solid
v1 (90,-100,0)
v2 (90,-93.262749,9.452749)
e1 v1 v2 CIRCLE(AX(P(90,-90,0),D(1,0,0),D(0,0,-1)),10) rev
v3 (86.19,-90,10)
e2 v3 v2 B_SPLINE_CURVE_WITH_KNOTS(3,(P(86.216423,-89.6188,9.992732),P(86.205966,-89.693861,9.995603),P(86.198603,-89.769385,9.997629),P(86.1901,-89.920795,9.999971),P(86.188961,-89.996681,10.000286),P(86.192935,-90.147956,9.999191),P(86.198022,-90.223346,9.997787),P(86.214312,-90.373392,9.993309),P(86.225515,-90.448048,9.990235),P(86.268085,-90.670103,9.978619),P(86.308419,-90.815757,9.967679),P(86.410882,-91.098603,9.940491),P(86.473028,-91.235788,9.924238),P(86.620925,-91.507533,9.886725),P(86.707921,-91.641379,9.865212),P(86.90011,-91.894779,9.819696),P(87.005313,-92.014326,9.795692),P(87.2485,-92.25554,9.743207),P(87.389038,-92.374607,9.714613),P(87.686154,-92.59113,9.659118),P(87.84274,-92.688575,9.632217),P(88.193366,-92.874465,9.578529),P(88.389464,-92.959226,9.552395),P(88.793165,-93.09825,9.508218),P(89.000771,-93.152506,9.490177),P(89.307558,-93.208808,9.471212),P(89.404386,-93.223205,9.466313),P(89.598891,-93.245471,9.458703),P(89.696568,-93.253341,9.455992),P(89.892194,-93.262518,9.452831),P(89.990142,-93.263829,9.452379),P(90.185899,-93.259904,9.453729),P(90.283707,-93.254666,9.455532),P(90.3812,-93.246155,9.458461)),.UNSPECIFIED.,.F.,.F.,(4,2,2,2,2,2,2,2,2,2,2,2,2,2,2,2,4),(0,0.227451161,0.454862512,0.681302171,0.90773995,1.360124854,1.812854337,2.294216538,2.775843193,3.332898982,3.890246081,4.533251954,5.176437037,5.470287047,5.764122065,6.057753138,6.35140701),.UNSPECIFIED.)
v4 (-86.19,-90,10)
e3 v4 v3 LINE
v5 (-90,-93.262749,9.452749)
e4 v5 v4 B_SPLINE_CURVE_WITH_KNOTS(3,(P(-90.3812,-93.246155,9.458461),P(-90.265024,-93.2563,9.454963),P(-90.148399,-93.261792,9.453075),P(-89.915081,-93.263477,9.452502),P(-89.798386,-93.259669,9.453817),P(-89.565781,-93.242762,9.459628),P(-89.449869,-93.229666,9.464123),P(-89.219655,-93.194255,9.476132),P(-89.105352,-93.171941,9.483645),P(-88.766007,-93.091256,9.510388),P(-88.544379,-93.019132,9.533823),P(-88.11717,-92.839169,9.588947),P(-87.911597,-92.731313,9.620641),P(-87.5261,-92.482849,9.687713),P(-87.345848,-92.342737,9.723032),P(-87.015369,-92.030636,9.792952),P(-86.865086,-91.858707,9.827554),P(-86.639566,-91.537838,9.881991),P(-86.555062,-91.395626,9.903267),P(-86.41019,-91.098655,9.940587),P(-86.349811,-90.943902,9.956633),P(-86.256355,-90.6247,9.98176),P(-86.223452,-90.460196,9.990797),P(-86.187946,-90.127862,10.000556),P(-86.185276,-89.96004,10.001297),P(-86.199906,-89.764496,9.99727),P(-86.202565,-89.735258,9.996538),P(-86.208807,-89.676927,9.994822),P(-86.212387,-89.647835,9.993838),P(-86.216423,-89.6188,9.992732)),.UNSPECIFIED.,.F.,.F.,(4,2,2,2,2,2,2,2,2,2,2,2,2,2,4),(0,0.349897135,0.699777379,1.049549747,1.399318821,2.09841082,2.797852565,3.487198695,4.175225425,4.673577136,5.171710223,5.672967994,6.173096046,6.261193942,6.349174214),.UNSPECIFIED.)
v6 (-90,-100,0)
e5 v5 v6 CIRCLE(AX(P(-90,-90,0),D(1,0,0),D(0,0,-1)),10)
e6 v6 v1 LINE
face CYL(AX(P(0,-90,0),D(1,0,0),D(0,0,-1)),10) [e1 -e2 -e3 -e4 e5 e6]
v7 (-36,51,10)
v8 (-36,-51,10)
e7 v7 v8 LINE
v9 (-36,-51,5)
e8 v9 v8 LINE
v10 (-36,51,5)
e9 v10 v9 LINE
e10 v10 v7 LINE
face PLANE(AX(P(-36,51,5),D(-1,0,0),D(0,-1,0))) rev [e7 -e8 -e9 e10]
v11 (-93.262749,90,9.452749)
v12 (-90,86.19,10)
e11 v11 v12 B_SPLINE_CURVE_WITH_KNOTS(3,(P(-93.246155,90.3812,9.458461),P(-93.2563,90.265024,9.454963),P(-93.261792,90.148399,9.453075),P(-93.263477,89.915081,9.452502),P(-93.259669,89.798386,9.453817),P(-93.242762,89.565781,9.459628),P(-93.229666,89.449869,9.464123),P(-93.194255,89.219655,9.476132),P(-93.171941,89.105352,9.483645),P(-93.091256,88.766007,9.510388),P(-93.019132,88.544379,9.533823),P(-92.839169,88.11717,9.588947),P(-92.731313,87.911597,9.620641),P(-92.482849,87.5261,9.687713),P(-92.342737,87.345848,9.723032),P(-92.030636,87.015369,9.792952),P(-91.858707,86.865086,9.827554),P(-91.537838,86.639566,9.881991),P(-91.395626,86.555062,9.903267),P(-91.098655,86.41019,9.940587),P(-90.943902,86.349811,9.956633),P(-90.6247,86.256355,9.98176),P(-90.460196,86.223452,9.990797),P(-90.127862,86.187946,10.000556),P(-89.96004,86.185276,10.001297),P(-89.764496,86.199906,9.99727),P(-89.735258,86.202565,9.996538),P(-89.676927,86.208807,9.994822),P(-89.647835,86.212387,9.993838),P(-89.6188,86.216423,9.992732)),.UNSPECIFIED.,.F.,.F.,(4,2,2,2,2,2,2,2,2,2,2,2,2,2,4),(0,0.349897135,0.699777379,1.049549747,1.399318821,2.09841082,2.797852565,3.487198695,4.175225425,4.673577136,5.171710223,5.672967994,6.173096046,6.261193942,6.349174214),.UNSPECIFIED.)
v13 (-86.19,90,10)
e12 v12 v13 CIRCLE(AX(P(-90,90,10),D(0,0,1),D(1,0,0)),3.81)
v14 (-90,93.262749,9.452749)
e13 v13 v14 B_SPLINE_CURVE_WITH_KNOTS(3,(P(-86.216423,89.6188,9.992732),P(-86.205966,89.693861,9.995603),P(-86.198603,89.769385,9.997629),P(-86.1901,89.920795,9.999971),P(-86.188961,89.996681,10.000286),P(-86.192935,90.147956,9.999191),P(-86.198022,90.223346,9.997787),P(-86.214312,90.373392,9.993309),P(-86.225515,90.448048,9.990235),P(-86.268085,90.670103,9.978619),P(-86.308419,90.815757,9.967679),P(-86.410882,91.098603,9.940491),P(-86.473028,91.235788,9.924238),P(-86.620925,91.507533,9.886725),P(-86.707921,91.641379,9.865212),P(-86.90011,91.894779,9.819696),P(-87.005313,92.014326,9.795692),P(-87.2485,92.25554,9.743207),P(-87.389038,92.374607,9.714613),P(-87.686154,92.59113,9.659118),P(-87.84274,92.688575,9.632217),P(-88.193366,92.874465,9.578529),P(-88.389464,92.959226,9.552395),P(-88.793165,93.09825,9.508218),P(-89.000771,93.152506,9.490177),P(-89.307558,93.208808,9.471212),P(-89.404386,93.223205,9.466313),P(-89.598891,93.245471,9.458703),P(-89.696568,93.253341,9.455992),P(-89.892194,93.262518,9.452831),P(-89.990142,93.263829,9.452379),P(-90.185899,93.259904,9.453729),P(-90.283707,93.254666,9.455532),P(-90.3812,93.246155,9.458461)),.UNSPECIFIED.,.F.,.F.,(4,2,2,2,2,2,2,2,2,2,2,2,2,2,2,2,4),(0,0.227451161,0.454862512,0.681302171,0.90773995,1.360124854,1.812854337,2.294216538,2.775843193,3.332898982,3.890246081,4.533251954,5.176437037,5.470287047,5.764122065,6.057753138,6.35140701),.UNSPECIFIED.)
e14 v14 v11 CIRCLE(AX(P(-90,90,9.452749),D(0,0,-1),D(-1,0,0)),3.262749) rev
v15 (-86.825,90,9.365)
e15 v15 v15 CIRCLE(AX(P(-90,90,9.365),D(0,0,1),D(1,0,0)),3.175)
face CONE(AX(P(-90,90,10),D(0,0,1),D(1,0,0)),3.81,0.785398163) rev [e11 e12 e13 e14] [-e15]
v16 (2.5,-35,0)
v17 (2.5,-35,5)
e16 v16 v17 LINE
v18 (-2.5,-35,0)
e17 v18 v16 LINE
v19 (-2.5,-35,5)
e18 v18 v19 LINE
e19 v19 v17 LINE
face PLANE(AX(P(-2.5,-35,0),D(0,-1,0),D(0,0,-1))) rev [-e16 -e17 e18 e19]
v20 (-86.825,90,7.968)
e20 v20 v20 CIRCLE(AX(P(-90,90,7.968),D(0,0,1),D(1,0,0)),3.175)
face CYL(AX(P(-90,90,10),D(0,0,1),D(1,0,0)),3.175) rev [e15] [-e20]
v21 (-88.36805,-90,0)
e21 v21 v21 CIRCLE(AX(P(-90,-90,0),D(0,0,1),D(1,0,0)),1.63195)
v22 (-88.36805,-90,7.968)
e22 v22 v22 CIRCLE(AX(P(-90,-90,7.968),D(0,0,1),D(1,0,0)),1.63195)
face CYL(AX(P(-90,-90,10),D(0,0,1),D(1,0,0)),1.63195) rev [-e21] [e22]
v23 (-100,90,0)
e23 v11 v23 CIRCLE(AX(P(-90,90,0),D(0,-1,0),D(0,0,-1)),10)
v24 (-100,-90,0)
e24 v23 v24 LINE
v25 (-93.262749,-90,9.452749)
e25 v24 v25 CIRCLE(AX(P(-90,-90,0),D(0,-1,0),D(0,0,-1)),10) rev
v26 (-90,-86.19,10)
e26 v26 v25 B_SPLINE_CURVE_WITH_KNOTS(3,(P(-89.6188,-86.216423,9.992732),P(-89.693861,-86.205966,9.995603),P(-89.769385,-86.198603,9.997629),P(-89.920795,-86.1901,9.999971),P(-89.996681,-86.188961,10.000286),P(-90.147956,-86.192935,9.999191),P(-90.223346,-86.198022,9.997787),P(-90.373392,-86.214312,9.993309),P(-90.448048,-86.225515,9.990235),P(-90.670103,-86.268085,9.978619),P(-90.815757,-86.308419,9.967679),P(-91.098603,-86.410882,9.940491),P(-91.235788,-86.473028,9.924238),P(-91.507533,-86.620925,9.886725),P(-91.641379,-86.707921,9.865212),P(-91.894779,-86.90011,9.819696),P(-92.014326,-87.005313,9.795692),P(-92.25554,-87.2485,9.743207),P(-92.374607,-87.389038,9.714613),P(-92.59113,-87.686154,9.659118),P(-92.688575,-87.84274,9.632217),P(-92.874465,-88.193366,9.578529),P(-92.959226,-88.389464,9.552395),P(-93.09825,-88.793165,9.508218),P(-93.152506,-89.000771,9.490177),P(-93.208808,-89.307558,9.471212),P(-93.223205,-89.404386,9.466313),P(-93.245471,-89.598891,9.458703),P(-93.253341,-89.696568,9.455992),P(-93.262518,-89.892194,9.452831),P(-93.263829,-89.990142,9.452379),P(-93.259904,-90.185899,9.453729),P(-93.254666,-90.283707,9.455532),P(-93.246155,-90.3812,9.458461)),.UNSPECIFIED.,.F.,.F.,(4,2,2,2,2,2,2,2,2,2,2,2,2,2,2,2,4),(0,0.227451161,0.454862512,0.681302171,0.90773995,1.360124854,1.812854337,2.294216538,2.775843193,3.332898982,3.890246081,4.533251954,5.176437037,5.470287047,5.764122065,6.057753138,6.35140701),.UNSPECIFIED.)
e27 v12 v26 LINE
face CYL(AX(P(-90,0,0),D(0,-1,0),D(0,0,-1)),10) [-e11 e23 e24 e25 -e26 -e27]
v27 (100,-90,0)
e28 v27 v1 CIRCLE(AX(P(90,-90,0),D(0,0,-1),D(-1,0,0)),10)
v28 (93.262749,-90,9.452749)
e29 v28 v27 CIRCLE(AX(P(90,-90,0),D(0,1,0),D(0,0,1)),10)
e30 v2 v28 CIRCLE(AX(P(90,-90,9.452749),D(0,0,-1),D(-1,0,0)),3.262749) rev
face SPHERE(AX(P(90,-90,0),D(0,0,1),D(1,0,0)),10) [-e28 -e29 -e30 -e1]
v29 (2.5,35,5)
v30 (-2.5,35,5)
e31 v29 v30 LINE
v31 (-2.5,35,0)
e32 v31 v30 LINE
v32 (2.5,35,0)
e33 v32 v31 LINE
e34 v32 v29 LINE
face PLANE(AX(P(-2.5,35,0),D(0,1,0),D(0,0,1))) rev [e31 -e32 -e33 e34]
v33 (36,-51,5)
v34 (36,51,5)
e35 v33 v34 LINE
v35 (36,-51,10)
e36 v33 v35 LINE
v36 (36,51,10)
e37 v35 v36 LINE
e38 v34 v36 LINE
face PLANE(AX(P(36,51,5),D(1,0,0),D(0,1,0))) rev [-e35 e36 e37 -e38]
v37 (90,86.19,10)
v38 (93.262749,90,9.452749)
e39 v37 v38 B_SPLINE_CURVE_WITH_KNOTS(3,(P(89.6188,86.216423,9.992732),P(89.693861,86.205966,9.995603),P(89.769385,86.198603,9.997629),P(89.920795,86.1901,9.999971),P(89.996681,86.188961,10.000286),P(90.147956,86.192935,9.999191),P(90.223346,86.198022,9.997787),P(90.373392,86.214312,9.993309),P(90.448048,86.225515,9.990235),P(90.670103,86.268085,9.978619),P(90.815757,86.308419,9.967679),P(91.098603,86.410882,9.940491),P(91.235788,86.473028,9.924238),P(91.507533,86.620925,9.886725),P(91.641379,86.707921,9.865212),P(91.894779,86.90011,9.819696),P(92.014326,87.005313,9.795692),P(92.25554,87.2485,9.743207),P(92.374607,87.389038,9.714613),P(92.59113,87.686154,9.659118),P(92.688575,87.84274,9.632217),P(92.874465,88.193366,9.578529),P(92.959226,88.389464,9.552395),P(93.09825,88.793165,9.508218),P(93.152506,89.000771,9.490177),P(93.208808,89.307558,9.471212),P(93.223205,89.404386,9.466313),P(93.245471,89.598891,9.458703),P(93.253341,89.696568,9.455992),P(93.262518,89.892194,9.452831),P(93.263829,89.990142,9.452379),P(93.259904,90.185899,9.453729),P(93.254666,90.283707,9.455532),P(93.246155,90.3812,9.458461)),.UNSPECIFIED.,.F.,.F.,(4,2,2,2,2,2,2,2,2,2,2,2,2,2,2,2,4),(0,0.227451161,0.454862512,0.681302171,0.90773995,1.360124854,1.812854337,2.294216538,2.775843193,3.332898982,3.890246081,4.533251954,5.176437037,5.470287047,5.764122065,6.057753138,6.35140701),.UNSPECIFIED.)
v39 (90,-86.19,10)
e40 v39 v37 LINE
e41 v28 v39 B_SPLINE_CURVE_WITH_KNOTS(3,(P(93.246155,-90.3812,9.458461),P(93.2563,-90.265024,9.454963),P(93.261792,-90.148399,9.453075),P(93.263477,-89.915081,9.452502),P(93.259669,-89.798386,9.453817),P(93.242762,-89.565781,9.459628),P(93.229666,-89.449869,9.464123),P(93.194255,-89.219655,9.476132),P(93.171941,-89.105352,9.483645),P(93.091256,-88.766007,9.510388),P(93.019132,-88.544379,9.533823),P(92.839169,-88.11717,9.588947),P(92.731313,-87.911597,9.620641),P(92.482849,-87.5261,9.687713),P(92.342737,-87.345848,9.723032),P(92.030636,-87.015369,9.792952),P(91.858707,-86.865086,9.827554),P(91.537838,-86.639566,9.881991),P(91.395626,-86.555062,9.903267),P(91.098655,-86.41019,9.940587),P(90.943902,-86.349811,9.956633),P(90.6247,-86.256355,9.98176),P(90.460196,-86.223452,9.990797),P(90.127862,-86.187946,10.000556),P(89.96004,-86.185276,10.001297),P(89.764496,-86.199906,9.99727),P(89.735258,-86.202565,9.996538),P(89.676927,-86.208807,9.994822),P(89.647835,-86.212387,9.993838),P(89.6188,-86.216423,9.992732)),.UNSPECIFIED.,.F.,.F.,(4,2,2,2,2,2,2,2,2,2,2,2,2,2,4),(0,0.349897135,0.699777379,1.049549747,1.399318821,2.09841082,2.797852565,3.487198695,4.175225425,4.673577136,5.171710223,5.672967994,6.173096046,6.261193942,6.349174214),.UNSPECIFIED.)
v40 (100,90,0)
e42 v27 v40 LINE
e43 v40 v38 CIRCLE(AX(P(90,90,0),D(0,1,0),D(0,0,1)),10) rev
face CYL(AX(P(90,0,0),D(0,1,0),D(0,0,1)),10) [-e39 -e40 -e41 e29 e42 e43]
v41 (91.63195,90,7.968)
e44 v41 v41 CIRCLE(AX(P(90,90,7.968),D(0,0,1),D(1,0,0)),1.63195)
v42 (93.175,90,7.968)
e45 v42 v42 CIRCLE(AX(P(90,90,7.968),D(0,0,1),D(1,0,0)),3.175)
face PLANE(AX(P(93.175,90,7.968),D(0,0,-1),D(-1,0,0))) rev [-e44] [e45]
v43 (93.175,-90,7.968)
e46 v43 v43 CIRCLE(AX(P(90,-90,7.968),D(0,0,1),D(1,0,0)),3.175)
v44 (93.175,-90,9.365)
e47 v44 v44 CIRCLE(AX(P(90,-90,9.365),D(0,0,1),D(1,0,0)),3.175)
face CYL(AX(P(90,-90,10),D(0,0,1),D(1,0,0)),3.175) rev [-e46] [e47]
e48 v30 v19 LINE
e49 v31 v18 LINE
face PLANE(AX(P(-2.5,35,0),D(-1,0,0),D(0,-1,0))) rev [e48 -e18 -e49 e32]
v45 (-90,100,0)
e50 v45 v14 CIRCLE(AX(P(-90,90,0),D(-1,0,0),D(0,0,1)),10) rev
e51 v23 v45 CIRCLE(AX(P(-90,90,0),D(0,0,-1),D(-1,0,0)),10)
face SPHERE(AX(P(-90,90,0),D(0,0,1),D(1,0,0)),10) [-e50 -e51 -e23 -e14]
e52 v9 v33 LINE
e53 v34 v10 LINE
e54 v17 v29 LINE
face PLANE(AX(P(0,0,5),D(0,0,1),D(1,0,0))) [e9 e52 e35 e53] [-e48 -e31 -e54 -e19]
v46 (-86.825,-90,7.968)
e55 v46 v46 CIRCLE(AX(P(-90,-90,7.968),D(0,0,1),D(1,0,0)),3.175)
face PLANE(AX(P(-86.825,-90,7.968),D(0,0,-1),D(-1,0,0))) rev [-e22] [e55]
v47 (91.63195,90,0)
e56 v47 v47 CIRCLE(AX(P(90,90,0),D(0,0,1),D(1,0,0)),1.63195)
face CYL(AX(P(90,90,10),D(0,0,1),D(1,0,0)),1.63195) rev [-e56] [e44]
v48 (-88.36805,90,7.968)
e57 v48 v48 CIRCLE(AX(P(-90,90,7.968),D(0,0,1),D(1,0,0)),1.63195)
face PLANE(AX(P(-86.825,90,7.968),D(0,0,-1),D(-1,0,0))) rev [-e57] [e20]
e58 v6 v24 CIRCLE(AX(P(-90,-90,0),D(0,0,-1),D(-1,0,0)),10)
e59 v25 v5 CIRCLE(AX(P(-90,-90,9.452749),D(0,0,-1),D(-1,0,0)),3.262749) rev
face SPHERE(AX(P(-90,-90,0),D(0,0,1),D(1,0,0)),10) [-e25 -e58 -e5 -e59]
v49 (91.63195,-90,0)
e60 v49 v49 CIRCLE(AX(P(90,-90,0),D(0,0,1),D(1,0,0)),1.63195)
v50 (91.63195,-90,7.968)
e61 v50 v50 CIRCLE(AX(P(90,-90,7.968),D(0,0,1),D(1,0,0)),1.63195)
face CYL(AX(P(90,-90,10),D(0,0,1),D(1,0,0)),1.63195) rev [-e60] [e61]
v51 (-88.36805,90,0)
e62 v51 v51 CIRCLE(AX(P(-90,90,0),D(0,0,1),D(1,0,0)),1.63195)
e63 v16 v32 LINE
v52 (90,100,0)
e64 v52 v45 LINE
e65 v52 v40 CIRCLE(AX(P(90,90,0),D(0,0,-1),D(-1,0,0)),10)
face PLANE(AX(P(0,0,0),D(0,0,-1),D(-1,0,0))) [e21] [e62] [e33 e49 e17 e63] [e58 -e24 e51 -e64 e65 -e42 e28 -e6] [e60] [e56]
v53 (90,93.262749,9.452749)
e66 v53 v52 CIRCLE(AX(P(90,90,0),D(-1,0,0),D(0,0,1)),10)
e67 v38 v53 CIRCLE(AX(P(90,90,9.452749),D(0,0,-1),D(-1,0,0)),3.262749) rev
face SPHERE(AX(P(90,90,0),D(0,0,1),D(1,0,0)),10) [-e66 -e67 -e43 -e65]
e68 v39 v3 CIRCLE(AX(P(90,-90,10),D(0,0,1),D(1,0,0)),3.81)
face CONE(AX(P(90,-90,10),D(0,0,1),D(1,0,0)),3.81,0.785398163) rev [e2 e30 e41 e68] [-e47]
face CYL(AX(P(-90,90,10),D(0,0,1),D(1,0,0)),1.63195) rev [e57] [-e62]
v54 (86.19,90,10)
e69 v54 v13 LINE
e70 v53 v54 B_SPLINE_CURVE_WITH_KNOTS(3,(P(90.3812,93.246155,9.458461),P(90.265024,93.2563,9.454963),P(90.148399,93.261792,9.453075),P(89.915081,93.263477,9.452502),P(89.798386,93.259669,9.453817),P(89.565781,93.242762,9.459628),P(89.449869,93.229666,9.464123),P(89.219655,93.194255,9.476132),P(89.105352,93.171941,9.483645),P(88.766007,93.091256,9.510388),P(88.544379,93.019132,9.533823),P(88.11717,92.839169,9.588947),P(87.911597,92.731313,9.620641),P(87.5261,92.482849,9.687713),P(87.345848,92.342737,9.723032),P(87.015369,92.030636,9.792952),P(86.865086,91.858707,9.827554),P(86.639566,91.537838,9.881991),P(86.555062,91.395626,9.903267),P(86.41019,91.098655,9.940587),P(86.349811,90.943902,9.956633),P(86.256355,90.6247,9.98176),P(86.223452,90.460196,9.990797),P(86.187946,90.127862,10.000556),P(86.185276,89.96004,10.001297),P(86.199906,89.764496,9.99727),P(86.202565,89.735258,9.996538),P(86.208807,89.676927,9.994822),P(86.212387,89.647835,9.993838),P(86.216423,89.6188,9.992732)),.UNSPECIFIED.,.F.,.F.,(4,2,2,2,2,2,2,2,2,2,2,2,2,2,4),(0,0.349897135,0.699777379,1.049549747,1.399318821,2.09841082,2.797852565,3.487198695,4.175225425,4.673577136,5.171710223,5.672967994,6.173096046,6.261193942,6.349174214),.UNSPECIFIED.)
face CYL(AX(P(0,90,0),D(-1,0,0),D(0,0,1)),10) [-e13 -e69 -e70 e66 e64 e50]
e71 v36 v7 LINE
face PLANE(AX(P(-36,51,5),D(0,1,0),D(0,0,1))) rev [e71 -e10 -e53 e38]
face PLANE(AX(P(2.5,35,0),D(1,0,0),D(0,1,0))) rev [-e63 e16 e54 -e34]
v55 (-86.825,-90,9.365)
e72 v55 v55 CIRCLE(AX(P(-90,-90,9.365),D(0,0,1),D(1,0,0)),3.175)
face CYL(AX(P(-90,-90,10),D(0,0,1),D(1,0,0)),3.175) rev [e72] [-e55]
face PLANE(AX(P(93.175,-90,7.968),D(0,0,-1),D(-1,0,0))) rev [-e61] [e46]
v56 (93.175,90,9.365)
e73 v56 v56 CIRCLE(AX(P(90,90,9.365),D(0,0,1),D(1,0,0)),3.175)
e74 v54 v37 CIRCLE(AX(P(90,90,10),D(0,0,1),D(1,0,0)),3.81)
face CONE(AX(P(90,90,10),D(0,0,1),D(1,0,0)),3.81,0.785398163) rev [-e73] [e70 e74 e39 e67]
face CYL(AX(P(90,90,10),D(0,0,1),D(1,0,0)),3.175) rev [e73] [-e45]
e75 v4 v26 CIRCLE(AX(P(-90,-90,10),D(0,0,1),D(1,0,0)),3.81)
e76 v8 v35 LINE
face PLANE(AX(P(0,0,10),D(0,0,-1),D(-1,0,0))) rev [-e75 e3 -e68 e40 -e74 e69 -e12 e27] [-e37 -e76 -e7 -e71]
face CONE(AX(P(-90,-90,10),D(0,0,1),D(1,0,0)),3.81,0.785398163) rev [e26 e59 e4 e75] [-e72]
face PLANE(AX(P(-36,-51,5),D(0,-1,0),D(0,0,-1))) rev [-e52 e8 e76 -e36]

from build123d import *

# Parameters (mm, degrees)
CROQUIS3_W                                  = 200
CROQUIS3_H                                  = 200
SALIENTE_EXTRUIR1_DEPTH                     = 10
CROQUIS4_W                                  = 72
CROQUIS4_H                                  = 102
CORTAR_EXTRUIR2_DEPTH                       = 5
CROQUIS5_W                                  = 5
CROQUIS5_H                                  = 70
CORTAR_EXTRUIR3_DEPTH                       = 142.774468788
REDONDEO1_R                                 = 10
REDONDEO2_R                                 = 10
REDONDEO3_R                                 = 10
REDONDEO4_R                                 = 10
REDONDEO5_R                                 = 10
REFRENTADO_PARA_TORNILLO_CON_CABEZA_2_COUNT = 2
REFRENTADO_PARA_TORNILLO_CON_CABEZA_2_PITCH = 180
REFRENTADO_PARA_TORNILLO_CON_CABEZA_3_COUNT = 2
REFRENTADO_PARA_TORNILLO_CON_CABEZA_3_PITCH = 254.558441227
REFRENTADO_PARA_TORNILLO_CON_CABEZA_4_COUNT = 2
REFRENTADO_PARA_TORNILLO_CON_CABEZA_4_PITCH = 180


# Some blends are built 0.0001 mm under size
with BuildPart() as part:
    # Croquis3 → Saliente-Extruir1 (new body)
    with BuildSketch(Plane.XY):
        Rectangle(CROQUIS3_W, CROQUIS3_H)
    extrude(amount=SALIENTE_EXTRUIR1_DEPTH)

    # Croquis4 → Cortar-Extruir2 (cut)
    with BuildSketch(Plane.XY.offset(10)):
        Rectangle(CROQUIS4_W, CROQUIS4_H)
    extrude(amount=-CORTAR_EXTRUIR2_DEPTH, mode=Mode.SUBTRACT)

    # Croquis5 → Cortar-Extruir3 (cut, through all)
    with BuildSketch(Plane.XY.offset(10)):
        Rectangle(CROQUIS5_W, CROQUIS5_H)
    extrude(amount=-CORTAR_EXTRUIR3_DEPTH, mode=Mode.SUBTRACT)

    # Redondeo1
    redondeo1_edges = [part.edges().sort_by_distance(p)[0] for p in [
        (-100, 0, 10),
        (0, -100, 10),
        (100, 0, 10),
        (0, 100, 10),
    ]]
    fillet(redondeo1_edges, radius=REDONDEO1_R - 0.0001)  # a hair under: the kernel refuses the full size

    # Redondeo2
    # the kernel refuses this fillet: 10 mm, written as the material it takes off along each edge
    with BuildSketch(Plane(origin=(90, 90, 10), x_dir=(1, 0, 0), z_dir=(0, -1, 0))) as redondeo2_piece_1:
        with BuildLine():
            CenterArc((0.0001, -9.9999), 9.9999, 0, 90)
            Line((10, -9.9999), (10, 0))
            Line((10, 0), (0.0001, 0))
        make_face()
    revolve(axis=Axis((90, 90, 10), (0, 0, 1)), revolution_arc=90, mode=Mode.SUBTRACT)
    with BuildSketch(Plane(origin=(100, 100, -25), x_dir=(0, -1, 0), z_dir=(0, 0, 1))) as redondeo2_piece_2:
        with BuildLine():
            CenterArc((REDONDEO2_R, -REDONDEO2_R), REDONDEO2_R, 90, 90)
            Line((0, -REDONDEO2_R), (0, 0))
            Line((0, 0), (REDONDEO2_R, 0))
        make_face()
    extrude(amount=35, mode=Mode.SUBTRACT)

    # Redondeo3
    # the kernel refuses this fillet: 10 mm, written as the material it takes off along each edge
    with BuildSketch(Plane(origin=(-90, -90, 10), x_dir=(-1, 0, 0), z_dir=(0, 1, 0))) as redondeo3_piece_1:
        with BuildLine():
            CenterArc((0.0001, -9.9999), 9.9999, 0, 90)
            Line((10, -9.9999), (10, 0))
            Line((10, 0), (0.0001, 0))
        make_face()
    revolve(axis=Axis((-90, -90, 10), (0, 0, 1)), revolution_arc=90, mode=Mode.SUBTRACT)
    with BuildSketch(Plane(origin=(-100, -100, -25), x_dir=(1, 0, 0), z_dir=(0, 0, 1))) as redondeo3_piece_2:
        with BuildLine():
            CenterArc((REDONDEO3_R, REDONDEO3_R), REDONDEO3_R, 180, 90)
            Line((0, REDONDEO3_R), (0, 0))
            Line((0, 0), (REDONDEO3_R, 0))
        make_face()
    extrude(amount=35, mode=Mode.SUBTRACT)

    # Redondeo4
    # the kernel refuses this fillet: 10 mm, written as the material it takes off along each edge
    with BuildSketch(Plane(origin=(90, -90, 10), x_dir=(0, -1, 0), z_dir=(-1, 0, 0))) as redondeo4_piece_1:
        with BuildLine():
            CenterArc((0.0001, -9.9999), 9.9999, 0, 90)
            Line((10, -9.9999), (10, 0))
            Line((10, 0), (0.0001, 0))
        make_face()
    revolve(axis=Axis((90, -90, 10), (0, 0, 1)), revolution_arc=90, mode=Mode.SUBTRACT)
    with BuildSketch(Plane(origin=(100, -100, -25), x_dir=(-1, 0, 0), z_dir=(0, 0, 1))) as redondeo4_piece_2:
        with BuildLine():
            CenterArc((REDONDEO4_R, -REDONDEO4_R), REDONDEO4_R, 90, 90)
            Line((0, -REDONDEO4_R), (0, 0))
            Line((0, 0), (REDONDEO4_R, 0))
        make_face()
    extrude(amount=35, mode=Mode.SUBTRACT)

    # Redondeo5
    # the kernel refuses this fillet: 10 mm, written as the material it takes off along each edge
    with BuildSketch(Plane(origin=(-90, 90, 10), x_dir=(0, 1, 0), z_dir=(1, 0, 0))) as redondeo5_piece_1:
        with BuildLine():
            CenterArc((0.0001, -9.9999), 9.9999, 0, 90)
            Line((10, -9.9999), (10, 0))
            Line((10, 0), (0.0001, 0))
        make_face()
    revolve(axis=Axis((-90, 90, 10), (0, 0, 1)), revolution_arc=90, mode=Mode.SUBTRACT)
    with BuildSketch(Plane(origin=(-100, 100, -25), x_dir=(0, -1, 0), z_dir=(0, 0, 1))) as redondeo5_piece_2:
        with BuildLine():
            CenterArc((REDONDEO5_R, REDONDEO5_R), REDONDEO5_R, 180, 90)
            Line((0, REDONDEO5_R), (0, 0))
            Line((0, 0), (REDONDEO5_R, 0))
        make_face()
    extrude(amount=35, mode=Mode.SUBTRACT)

    # Croquis16 → Refrentado para tornillo con cabeza troncocónica de #45 (revolve, cut)
    with BuildSketch(Plane(origin=(-90, 90, 10), x_dir=(0, -1, 0), z_dir=(1, 0, 0))):
        Polygon((0, 0), (0, 10), (1.63195, 10), (1.63195, 2.032), (3.175, 2.032), (3.175, 0.635), (3.81, 0), align=None)
    refrentado_para_tornillo_con_cabeza_tron = revolve(axis=Axis((-90, 90, 16.35), (0, 0, -1)), mode=Mode.SUBTRACT)

    # Refrentado para tornillo con cabeza  2: Refrentado para tornillo con cabeza troncocónica de #45 ×2
    with Locations(*[(i * REFRENTADO_PARA_TORNILLO_CON_CABEZA_2_PITCH, 0, 0) for i in range(1, REFRENTADO_PARA_TORNILLO_CON_CABEZA_2_COUNT)]):
        add(refrentado_para_tornillo_con_cabeza_tron, mode=Mode.SUBTRACT)

    # Refrentado para tornillo con cabeza  3: Refrentado para tornillo con cabeza troncocónica de #45 ×2
    with Locations(*[Vector(0.7071067811865476, -0.7071067811865476, 0) * (i * REFRENTADO_PARA_TORNILLO_CON_CABEZA_3_PITCH) for i in range(1, REFRENTADO_PARA_TORNILLO_CON_CABEZA_3_COUNT)]):
        add(refrentado_para_tornillo_con_cabeza_tron, mode=Mode.SUBTRACT)

    # Refrentado para tornillo con cabeza  4: Refrentado para tornillo con cabeza troncocónica de #45 ×2
    with Locations(*[(0, -i * REFRENTADO_PARA_TORNILLO_CON_CABEZA_4_PITCH, 0) for i in range(1, REFRENTADO_PARA_TORNILLO_CON_CABEZA_4_COUNT)]):
        add(refrentado_para_tornillo_con_cabeza_tron, mode=Mode.SUBTRACT)


solid = part.part
